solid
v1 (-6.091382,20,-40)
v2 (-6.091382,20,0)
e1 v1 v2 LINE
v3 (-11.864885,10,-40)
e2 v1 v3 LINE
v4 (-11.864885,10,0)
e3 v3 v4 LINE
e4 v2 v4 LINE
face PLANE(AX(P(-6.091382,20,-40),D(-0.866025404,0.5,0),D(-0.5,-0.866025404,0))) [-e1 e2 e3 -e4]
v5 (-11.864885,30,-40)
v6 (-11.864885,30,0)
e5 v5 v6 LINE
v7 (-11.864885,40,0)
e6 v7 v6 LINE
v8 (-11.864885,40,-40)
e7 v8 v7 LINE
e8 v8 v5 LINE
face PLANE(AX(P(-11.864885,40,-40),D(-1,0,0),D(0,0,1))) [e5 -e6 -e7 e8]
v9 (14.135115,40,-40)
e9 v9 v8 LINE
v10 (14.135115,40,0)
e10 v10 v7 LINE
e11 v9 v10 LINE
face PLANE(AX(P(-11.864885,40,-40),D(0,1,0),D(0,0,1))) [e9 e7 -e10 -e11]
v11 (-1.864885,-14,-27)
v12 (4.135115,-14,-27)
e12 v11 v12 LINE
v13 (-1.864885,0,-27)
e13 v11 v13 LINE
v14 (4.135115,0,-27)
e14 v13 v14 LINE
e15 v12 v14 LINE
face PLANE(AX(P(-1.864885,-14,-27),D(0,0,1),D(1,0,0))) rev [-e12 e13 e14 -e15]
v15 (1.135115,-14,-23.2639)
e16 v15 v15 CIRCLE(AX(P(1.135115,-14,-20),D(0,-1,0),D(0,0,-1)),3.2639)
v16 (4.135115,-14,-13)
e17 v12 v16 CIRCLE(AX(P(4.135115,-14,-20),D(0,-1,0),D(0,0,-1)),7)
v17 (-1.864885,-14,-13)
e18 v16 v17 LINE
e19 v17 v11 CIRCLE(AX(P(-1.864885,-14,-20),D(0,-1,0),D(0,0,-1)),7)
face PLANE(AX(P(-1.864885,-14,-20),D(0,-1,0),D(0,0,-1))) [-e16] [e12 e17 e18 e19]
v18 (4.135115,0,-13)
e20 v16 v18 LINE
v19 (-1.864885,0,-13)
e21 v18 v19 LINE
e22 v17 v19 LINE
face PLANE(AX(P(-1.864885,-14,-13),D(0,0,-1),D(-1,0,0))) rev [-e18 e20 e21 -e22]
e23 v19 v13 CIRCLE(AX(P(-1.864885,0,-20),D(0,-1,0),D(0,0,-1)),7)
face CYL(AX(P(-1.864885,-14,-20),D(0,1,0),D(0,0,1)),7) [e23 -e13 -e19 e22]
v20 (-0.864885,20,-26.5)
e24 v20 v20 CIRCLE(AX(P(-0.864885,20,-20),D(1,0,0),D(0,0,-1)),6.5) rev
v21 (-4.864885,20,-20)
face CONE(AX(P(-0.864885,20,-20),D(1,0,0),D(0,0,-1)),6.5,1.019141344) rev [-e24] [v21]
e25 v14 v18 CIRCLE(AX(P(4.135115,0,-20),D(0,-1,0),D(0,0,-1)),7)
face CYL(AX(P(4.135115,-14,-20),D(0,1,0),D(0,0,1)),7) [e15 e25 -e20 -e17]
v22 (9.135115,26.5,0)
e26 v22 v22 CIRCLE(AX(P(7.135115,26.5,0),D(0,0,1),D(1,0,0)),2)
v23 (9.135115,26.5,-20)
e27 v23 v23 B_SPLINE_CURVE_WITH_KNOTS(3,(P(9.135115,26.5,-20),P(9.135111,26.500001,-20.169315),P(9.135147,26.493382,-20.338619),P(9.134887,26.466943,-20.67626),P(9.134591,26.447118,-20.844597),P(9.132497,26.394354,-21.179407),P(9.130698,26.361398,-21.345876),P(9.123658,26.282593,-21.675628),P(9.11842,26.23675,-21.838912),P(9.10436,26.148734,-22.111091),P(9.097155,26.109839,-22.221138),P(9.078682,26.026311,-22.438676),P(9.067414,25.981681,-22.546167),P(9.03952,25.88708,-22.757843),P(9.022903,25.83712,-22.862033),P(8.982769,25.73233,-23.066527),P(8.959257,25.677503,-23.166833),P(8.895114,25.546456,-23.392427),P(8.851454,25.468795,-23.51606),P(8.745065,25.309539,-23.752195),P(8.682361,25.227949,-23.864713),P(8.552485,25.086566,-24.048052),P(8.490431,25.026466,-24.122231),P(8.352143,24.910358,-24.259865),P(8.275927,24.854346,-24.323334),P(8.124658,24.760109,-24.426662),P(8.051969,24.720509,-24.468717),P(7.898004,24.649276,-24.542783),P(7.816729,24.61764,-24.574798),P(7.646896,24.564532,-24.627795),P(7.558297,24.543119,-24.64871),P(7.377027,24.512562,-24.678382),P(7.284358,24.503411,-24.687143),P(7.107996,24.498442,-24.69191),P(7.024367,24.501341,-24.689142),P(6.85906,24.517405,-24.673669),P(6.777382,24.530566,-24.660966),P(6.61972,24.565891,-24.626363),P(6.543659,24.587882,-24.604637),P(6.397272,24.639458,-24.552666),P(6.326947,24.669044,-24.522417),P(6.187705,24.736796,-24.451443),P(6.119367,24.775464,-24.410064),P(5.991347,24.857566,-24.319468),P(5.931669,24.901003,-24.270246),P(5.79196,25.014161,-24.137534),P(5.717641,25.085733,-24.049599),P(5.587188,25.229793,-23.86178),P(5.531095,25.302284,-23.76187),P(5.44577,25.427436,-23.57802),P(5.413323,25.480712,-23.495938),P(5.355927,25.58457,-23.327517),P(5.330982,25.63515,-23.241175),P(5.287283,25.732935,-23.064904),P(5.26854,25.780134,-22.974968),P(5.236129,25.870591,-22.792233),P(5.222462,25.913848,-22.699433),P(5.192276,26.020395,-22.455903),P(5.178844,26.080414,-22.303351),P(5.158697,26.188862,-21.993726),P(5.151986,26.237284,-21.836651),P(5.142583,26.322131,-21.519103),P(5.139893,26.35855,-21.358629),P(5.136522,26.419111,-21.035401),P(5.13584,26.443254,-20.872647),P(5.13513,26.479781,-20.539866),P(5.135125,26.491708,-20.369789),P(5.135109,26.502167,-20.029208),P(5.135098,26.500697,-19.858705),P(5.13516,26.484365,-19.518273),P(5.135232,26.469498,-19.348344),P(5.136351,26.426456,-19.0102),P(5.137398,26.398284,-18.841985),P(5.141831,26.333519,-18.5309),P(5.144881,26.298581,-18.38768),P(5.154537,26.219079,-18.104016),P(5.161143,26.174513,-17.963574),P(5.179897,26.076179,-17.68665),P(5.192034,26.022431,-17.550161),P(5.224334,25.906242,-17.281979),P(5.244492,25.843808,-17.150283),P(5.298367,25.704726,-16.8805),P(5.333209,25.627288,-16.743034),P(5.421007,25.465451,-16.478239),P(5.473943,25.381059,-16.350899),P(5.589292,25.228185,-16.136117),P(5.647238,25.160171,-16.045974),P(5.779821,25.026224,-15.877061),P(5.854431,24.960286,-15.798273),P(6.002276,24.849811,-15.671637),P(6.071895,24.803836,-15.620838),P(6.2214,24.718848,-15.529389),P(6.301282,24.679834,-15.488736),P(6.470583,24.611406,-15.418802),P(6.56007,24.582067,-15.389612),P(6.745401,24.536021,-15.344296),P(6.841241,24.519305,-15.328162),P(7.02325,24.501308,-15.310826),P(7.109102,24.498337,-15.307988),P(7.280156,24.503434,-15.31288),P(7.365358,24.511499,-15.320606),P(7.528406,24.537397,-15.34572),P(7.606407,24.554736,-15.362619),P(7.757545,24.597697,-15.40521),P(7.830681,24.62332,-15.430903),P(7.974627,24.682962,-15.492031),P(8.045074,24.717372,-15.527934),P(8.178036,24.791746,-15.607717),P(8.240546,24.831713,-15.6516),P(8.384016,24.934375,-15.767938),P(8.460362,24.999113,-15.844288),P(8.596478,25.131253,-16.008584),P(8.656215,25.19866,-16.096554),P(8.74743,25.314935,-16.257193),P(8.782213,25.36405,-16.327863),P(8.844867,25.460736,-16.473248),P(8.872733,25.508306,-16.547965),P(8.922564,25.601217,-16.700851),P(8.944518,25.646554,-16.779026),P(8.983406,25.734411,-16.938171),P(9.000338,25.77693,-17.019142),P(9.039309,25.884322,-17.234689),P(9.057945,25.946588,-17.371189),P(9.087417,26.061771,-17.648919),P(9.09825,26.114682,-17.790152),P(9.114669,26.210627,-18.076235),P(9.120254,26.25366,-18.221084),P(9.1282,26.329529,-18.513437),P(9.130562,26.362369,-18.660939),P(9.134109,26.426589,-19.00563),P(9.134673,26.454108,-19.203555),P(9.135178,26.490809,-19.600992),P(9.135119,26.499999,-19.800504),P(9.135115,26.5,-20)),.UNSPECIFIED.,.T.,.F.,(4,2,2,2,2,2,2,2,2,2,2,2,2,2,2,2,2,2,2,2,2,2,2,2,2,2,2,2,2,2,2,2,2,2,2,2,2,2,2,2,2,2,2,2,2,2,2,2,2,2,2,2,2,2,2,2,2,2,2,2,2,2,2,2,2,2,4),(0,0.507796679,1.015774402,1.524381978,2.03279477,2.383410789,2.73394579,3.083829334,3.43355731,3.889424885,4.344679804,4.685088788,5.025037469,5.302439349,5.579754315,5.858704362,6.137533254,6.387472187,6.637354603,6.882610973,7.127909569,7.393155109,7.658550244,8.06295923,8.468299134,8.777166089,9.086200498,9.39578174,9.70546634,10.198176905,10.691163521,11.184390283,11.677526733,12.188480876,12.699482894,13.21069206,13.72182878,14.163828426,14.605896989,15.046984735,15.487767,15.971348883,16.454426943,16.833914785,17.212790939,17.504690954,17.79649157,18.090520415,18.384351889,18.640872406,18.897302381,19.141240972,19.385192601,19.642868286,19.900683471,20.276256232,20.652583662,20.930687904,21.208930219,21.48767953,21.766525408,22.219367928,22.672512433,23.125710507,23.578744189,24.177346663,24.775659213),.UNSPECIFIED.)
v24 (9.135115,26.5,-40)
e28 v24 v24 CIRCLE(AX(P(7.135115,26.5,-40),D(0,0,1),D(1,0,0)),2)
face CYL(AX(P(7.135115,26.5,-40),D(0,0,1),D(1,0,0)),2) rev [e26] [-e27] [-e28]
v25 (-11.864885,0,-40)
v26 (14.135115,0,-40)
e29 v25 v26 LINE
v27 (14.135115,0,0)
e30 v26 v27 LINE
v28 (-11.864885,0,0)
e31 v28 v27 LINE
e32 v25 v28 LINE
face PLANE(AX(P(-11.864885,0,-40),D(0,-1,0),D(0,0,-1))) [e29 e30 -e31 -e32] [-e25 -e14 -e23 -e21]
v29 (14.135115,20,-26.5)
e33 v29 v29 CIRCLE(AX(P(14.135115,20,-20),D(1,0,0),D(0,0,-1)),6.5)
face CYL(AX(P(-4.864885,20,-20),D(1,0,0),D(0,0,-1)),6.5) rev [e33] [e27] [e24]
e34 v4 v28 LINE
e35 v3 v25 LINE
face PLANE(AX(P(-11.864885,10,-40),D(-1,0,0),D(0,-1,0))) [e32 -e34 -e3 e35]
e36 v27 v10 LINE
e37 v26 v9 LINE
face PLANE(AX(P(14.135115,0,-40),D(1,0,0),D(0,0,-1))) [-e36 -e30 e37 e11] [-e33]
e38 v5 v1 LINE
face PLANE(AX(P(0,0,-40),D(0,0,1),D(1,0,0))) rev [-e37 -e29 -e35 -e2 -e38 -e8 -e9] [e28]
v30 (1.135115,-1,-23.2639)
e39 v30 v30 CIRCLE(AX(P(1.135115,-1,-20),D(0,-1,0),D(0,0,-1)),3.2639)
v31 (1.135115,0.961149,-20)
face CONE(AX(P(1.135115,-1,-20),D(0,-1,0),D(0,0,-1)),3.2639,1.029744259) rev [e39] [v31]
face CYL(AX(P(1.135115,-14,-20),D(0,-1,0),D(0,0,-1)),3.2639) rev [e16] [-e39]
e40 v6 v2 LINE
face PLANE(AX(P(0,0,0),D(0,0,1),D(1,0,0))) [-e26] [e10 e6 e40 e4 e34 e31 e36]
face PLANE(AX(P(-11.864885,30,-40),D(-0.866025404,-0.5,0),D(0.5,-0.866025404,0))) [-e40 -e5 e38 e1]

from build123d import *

# Parameters (mm, degrees)
RESSALTO_EXTRUS_O1_DEPTH                       = 40
ESBO_O2_R                                      = 6.5
CORTE_EXTRUS_O1_DEPTH                          = 19
CHANFRO1_SIZE2                                 = 6.5
CHANFRO1_SIZE                                  = 4
ESBO_O3_R                                      = 2
CORTE_EXTRUS_O2_DEPTH                          = 59.307816613
RESSALTO_EXTRUS_O2_DEPTH                       = 14
BROCA_DE_ROSQUEAR_PARA_TARRAXA_DE_5_16_1_D     = 6.5278
BROCA_DE_ROSQUEAR_PARA_TARRAXA_DE_5_16_1_DEPTH = 13
BROCA_DE_ROSQUEAR_PARA_TARRAXA_DE_5_16_1_TIP   = 1.961148974


with BuildPart() as part:
    # Esboço1 → Ressalto-extrusão1 (new body)
    with BuildSketch(Plane.XY):
        Polygon((-11.864884923, 0), (14.135115077, 0), (14.135115077, 40), (-11.864884923, 40), (-11.864884923, 30), (-6.091382231, 20), (-11.864884923, 10), align=None)
    extrude(amount=-RESSALTO_EXTRUS_O1_DEPTH)

    # Esboço2 → Corte-extrusão1 (cut)
    with BuildSketch(Plane(origin=(14.135115077, 0, 0), x_dir=(0, 0, -1), z_dir=(1, 0, 0))):
        with Locations((20, 20)):
            Circle(ESBO_O2_R)
    extrude(amount=-CORTE_EXTRUS_O1_DEPTH, mode=Mode.SUBTRACT)

    # Chanfro1
    chanfro1_edges = [part.edges().sort_by_distance(p)[0] for p in [
        (-4.864884923, 20, -13.5),
    ]]
    chanfro1_side = [part.faces().sort_by_distance(p)[0] for p in [
        (-4.784884923, 20, -13.5),
    ]]
    chamfer(chanfro1_edges, length=CHANFRO1_SIZE - 0.0001, length2=CHANFRO1_SIZE2 - 0.0001, reference=chanfro1_side[0])  # a hair under: the kernel refuses the full size

    # Esboço3 → Corte-extrusão2 (cut, through all)
    with BuildSketch(Plane.XY):
        with Locations((7.135115077, 26.5)):
            Circle(ESBO_O3_R)
    extrude(amount=-CORTE_EXTRUS_O2_DEPTH, mode=Mode.SUBTRACT)

    # Esboço4 → Ressalto-extrusão2 (add)
    with BuildSketch(Plane.XZ):
        with BuildLine():
            Line((-1.864884923, -13), (4.135115077, -13))
            ThreePointArc((4.135115077, -13), (11.135115077, -20), (4.135115077, -27))
            Line((4.135115077, -27), (-1.864884923, -27))
            ThreePointArc((-1.864884923, -27), (-8.864884923, -20), (-1.864884923, -13))
        make_face()
    extrude(amount=RESSALTO_EXTRUS_O2_DEPTH)

    # Broca de rosquear para tarraxa de 5/16-181
    with Locations(Plane(origin=(0, -14, 0), x_dir=(-1, 0, 0), z_dir=(0, -1, 0))):
        with Locations((-1.135115077, 20)):
            Hole(BROCA_DE_ROSQUEAR_PARA_TARRAXA_DE_5_16_1_D / 2, depth=BROCA_DE_ROSQUEAR_PARA_TARRAXA_DE_5_16_1_DEPTH)
            with Locations((0, 0, -(BROCA_DE_ROSQUEAR_PARA_TARRAXA_DE_5_16_1_DEPTH + BROCA_DE_ROSQUEAR_PARA_TARRAXA_DE_5_16_1_TIP / 2))):  # 118° drill point
                Cone(0, BROCA_DE_ROSQUEAR_PARA_TARRAXA_DE_5_16_1_D / 2, BROCA_DE_ROSQUEAR_PARA_TARRAXA_DE_5_16_1_TIP, mode=Mode.SUBTRACT)


solid = part.part
